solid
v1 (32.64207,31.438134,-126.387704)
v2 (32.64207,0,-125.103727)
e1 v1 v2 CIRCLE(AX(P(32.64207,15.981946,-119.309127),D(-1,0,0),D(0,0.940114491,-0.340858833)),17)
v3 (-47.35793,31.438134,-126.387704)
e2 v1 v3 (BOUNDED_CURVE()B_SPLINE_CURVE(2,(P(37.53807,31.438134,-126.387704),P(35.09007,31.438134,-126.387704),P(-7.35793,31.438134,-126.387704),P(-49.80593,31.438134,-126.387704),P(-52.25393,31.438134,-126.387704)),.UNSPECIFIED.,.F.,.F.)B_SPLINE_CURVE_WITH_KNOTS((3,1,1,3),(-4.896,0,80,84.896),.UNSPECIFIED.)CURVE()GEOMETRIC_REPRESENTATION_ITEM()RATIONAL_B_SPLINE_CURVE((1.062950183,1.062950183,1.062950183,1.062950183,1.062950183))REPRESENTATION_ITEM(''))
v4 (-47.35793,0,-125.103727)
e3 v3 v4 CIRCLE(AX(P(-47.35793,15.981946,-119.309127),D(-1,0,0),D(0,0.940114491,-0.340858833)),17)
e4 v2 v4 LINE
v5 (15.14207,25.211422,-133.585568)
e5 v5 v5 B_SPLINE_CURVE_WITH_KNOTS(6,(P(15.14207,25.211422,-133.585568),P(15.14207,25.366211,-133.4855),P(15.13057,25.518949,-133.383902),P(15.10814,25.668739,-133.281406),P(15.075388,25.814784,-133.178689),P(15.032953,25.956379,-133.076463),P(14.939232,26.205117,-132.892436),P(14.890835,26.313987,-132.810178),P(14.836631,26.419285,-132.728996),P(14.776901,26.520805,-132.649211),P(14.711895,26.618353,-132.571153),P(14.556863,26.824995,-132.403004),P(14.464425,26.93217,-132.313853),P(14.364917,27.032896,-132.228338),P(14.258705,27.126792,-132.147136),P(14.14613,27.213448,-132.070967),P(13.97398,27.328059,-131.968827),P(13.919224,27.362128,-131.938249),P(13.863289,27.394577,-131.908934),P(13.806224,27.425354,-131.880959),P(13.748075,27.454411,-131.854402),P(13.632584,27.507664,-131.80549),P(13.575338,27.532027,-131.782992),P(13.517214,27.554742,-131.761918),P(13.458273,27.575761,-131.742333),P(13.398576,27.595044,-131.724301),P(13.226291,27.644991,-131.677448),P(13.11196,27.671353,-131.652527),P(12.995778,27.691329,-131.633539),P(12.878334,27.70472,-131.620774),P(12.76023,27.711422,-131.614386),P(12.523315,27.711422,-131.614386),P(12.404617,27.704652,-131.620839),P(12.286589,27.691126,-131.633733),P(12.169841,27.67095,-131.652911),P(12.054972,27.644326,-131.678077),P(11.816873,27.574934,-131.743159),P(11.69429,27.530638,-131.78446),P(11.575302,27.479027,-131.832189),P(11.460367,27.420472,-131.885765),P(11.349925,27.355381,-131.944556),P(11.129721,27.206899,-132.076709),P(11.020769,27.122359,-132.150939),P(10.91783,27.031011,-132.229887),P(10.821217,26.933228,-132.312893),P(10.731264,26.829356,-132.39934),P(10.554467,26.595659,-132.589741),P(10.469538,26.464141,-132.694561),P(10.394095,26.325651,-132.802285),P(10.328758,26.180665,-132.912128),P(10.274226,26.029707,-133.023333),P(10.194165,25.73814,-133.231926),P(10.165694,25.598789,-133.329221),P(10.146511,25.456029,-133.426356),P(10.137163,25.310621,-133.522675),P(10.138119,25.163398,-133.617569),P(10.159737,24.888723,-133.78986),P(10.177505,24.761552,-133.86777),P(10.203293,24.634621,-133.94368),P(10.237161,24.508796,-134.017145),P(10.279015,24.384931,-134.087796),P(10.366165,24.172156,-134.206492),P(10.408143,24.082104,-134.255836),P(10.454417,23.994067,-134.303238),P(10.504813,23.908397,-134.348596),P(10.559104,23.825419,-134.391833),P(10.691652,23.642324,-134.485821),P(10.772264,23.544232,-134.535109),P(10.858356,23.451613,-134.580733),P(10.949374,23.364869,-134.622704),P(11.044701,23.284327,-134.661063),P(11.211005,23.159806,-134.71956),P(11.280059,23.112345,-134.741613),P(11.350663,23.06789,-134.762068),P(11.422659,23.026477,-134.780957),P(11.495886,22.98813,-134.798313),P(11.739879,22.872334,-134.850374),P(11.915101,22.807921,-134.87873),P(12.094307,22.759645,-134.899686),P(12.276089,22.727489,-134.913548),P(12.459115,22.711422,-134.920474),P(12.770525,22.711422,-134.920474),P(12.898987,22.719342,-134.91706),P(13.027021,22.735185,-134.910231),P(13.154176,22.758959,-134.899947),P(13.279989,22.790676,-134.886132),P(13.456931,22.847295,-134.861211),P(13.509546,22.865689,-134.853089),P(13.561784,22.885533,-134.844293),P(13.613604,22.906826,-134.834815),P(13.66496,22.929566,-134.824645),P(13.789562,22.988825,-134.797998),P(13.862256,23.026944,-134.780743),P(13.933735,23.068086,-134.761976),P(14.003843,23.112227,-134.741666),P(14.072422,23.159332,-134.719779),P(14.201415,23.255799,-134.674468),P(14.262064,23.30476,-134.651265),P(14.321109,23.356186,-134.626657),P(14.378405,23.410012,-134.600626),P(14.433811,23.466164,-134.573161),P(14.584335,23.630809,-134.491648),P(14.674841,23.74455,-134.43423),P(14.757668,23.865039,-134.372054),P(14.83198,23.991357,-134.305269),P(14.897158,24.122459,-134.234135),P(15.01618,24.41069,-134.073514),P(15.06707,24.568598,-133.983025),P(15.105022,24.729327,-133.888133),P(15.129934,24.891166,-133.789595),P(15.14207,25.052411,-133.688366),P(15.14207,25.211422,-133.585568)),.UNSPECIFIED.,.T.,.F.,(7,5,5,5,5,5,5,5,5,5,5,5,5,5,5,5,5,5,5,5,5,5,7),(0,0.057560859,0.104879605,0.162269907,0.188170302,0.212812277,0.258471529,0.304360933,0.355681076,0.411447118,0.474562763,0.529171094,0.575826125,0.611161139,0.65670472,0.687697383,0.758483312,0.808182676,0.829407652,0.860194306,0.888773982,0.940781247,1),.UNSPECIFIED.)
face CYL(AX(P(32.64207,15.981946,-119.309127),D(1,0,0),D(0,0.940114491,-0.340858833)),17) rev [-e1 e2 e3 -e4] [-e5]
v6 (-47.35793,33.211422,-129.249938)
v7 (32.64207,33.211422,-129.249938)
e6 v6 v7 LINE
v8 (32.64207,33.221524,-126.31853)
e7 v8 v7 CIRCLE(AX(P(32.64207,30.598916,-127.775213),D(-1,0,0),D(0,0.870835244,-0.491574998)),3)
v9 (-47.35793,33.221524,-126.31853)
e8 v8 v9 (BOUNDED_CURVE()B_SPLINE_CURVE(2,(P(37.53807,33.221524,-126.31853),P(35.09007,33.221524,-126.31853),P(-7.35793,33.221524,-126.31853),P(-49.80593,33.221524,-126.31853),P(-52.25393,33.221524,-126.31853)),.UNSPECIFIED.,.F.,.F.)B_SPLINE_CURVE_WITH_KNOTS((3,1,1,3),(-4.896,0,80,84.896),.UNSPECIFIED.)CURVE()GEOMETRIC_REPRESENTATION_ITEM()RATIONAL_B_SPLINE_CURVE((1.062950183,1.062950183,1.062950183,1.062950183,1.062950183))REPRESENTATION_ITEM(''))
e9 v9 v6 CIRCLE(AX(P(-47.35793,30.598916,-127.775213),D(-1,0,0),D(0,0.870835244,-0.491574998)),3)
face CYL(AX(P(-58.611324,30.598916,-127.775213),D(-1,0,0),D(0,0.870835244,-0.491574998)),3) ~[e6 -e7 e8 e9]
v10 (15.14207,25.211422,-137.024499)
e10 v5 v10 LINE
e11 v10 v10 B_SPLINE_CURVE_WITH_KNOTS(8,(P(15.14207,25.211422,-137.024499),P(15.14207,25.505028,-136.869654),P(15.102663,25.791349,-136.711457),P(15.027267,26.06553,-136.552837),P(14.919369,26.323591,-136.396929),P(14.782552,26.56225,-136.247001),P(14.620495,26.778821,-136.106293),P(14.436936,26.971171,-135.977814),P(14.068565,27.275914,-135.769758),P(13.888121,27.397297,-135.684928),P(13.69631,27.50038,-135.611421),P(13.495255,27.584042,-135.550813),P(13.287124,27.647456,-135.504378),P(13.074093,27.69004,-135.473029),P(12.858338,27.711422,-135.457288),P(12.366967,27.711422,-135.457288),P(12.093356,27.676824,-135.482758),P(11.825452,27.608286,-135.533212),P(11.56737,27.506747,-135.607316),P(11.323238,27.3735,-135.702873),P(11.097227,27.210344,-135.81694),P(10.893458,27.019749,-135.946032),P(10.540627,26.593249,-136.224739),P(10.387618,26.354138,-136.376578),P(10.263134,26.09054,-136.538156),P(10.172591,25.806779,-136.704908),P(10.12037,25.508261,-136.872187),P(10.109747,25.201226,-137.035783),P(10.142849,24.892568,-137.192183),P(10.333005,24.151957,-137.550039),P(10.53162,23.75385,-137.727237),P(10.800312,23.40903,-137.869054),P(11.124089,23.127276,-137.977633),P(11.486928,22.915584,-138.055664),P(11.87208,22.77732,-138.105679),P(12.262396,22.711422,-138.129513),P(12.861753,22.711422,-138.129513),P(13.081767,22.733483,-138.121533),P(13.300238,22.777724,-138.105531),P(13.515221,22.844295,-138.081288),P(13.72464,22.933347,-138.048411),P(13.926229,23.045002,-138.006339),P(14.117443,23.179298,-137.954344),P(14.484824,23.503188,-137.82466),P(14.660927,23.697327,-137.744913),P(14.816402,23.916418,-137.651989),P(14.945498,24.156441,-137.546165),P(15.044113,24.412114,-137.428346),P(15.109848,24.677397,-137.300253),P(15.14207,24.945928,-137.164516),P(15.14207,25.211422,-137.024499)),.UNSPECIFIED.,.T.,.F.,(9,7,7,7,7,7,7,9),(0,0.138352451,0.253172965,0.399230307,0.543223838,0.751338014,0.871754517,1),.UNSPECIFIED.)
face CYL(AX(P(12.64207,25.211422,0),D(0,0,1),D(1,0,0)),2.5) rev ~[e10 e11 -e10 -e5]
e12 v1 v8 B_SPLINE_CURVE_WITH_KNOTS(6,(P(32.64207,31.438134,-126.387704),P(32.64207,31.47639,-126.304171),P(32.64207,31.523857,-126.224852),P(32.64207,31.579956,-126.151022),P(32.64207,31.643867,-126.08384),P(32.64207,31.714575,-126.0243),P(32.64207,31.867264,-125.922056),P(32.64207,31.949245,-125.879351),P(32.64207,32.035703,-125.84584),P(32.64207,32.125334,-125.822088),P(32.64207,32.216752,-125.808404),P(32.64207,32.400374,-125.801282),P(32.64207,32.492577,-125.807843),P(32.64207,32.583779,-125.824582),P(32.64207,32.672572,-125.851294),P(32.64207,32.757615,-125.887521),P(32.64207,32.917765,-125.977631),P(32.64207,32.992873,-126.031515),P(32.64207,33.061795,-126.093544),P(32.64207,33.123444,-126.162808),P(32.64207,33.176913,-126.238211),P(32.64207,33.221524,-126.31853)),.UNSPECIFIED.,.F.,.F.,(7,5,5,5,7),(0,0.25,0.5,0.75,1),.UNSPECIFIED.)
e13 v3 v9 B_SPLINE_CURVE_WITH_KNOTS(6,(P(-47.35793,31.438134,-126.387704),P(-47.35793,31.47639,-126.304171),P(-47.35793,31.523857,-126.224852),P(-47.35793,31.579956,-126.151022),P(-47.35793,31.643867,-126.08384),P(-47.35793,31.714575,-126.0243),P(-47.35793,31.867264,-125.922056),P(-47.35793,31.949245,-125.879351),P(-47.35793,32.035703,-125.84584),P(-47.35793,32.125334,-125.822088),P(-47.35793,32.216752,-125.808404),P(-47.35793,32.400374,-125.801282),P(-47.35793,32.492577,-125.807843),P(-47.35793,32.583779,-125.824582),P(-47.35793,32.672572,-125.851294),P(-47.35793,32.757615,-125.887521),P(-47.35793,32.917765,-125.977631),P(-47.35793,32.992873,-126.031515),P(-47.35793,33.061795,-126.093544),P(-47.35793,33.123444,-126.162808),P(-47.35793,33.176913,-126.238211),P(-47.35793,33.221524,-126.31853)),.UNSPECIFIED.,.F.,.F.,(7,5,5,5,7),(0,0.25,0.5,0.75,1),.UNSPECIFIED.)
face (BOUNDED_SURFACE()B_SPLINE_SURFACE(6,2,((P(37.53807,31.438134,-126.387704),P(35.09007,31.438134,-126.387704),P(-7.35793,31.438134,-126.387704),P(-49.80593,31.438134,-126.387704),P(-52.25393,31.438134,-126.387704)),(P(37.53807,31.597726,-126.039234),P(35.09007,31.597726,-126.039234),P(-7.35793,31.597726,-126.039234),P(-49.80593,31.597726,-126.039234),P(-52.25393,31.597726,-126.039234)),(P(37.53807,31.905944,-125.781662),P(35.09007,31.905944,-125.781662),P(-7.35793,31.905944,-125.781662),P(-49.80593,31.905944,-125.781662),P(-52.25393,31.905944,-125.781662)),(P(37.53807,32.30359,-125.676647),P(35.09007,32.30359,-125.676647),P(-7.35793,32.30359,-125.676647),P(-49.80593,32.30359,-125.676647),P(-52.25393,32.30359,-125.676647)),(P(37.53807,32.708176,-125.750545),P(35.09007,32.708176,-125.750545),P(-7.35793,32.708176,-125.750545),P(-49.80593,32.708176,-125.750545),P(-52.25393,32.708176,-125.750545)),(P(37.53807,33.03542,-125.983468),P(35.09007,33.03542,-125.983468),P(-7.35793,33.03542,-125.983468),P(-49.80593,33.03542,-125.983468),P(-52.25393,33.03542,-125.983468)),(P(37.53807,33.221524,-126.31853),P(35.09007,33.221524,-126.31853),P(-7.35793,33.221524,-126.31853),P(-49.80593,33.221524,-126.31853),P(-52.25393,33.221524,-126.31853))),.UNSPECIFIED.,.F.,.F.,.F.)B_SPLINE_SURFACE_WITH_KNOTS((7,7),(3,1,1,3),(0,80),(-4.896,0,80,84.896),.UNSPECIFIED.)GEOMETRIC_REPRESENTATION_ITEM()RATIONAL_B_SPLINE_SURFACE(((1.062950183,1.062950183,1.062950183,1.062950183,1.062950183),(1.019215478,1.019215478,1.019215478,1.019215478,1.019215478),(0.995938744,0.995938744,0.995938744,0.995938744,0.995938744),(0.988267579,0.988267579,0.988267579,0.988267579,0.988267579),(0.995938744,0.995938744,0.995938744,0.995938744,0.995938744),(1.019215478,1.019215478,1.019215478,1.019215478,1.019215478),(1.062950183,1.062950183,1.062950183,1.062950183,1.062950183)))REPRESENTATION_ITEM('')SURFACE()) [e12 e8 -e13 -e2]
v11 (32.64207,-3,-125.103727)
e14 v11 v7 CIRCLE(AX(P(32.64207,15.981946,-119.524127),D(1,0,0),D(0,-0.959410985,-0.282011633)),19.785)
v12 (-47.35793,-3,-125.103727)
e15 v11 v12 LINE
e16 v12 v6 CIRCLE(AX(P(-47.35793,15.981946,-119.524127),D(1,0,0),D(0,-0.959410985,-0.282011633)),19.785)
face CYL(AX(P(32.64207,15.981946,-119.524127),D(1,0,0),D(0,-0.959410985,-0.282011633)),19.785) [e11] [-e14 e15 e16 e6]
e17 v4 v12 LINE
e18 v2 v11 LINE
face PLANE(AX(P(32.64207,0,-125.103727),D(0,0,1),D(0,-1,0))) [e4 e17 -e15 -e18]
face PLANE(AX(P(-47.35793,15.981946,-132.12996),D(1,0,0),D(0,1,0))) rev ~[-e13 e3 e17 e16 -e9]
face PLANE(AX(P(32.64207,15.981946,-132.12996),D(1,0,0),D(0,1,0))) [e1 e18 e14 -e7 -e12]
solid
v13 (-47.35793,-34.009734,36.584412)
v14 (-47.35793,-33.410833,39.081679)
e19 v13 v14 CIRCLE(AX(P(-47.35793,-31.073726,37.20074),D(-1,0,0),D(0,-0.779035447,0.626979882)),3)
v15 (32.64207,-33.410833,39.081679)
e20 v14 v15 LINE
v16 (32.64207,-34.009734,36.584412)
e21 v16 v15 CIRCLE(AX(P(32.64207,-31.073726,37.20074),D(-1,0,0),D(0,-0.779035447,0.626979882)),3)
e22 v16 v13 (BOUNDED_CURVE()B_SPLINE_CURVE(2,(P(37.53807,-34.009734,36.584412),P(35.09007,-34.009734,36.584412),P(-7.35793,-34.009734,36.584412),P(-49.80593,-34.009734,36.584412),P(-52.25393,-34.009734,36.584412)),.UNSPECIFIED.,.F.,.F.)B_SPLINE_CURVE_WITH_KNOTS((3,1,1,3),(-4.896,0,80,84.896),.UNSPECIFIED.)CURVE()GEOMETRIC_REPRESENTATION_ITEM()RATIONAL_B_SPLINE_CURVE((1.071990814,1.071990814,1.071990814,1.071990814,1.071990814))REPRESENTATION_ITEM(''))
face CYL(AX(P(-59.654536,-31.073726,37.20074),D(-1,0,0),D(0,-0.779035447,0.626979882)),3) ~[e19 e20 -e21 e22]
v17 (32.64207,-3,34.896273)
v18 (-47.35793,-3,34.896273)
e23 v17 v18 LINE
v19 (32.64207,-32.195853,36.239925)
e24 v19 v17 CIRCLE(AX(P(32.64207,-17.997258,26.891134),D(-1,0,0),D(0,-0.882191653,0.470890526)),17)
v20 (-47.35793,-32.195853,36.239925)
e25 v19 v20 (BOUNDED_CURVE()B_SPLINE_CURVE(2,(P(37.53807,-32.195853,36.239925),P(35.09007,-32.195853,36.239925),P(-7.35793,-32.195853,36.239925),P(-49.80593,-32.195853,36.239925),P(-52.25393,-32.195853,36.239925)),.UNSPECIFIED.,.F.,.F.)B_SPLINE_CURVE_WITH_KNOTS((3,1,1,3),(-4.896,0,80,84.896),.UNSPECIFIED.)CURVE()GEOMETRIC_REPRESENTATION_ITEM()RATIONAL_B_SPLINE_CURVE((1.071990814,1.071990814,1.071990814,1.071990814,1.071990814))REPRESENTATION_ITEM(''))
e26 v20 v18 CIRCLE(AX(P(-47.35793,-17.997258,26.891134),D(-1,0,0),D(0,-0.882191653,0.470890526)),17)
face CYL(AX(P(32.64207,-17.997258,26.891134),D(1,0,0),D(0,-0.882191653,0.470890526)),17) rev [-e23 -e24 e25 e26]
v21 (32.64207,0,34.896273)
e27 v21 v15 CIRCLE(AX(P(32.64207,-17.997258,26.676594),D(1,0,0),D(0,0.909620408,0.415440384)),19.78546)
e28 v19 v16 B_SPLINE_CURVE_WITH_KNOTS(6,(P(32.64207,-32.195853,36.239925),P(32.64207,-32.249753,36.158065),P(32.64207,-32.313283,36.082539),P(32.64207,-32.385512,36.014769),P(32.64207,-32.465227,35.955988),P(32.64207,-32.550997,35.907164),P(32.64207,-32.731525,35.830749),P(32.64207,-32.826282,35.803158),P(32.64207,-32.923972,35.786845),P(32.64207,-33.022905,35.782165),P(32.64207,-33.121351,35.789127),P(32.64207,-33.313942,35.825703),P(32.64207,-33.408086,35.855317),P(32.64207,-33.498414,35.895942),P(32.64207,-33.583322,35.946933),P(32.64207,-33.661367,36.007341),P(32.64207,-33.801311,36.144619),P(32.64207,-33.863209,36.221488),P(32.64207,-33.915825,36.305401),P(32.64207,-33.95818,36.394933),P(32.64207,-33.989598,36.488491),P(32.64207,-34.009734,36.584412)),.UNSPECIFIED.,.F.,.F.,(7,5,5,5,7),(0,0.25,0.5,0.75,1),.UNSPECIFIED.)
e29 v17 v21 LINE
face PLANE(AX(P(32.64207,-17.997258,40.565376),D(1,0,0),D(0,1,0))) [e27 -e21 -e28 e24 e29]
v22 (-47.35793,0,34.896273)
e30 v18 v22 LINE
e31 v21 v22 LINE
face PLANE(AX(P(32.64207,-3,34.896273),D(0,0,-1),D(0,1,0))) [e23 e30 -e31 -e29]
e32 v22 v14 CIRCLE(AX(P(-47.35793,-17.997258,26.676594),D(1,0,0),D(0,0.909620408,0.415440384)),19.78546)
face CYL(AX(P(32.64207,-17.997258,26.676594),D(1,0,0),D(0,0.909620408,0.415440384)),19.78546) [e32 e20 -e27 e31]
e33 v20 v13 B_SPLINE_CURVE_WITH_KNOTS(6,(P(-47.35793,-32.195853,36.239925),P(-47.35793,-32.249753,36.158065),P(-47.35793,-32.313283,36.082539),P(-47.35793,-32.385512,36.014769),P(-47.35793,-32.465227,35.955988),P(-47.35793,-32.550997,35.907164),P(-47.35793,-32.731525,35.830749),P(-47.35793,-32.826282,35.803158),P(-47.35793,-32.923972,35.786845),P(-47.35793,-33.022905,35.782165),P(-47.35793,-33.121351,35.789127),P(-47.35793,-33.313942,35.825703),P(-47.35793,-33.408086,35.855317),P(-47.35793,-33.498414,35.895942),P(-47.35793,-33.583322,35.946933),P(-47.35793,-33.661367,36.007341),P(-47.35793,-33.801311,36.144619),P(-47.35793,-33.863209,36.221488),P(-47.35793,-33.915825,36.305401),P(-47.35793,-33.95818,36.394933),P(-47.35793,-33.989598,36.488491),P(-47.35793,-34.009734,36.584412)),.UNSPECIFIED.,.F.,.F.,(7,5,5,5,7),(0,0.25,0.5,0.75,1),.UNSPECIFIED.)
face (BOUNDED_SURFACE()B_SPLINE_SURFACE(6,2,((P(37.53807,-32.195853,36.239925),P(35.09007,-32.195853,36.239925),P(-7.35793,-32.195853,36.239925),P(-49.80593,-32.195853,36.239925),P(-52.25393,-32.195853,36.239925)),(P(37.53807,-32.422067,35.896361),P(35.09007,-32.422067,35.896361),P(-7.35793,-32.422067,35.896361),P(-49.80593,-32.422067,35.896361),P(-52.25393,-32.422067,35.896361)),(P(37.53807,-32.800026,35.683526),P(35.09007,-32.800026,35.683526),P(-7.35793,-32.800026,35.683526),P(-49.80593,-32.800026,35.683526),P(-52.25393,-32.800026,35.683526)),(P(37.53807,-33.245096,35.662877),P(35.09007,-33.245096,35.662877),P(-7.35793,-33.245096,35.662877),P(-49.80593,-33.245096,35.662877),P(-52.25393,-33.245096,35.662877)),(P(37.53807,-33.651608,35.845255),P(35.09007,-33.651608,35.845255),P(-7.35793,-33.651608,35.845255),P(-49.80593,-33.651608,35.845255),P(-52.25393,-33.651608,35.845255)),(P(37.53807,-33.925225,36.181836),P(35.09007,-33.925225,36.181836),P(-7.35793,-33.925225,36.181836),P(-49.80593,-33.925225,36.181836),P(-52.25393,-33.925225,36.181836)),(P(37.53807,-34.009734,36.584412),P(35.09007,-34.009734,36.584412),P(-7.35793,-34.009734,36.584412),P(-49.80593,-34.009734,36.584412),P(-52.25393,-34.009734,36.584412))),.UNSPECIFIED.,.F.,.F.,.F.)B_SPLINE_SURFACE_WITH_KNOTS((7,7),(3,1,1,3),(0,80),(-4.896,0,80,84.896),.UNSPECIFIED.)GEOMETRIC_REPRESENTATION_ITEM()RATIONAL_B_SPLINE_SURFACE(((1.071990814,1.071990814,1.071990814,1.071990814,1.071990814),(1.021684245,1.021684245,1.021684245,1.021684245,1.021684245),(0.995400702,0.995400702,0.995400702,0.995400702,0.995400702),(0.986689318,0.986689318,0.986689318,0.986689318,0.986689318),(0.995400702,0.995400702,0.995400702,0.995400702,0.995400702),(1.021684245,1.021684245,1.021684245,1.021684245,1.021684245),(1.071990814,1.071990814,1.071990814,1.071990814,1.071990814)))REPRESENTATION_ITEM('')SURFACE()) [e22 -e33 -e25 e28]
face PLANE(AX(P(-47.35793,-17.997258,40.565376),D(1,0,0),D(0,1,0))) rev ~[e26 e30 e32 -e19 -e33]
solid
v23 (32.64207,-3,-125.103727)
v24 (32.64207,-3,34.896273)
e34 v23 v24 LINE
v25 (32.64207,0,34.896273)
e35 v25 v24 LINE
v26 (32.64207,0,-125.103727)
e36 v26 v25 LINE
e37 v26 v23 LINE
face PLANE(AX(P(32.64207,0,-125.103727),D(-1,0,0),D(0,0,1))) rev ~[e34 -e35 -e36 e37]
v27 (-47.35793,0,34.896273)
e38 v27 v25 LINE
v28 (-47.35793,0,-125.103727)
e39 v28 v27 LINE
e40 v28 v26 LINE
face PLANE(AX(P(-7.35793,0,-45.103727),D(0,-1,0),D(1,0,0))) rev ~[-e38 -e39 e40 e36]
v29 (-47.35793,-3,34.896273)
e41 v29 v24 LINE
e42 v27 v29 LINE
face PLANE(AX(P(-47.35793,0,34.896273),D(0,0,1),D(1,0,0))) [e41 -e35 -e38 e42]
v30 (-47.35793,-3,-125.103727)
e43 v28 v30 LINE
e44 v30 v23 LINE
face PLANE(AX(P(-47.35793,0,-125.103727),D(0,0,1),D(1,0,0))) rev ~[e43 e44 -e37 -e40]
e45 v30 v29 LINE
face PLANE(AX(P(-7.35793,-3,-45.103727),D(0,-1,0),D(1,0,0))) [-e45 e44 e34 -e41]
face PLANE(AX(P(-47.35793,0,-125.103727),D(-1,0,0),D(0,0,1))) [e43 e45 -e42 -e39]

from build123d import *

# Parameters (mm, degrees)
F0_W          = 80
F0_H          = 160
F1_DEPTH      = 3
F3_DEPTH      = 80
F4_T1_DEPTH   = 104.5932134922
F4_2_T1_DEPTH = 102.506788887
F5_R          = 1
F5_2_R        = 1
F6_R          = 2.5
F7_DEPTH      = 139.3101269636


# Not quite as in the source:
# - a fillet or chamfer that OpenCascade refuses, or shapes differently, is made with other operations: its cross-section is extruded or revolved along the edge and cut away or added


with BuildPart() as f1:
    # F0 (on Front) → F1 (new body)
    with BuildSketch(Plane.XZ):
        with Locations((-7.3579295626, -45.1037270249)):
            Rectangle(F0_W, F0_H)
    extrude(amount=F1_DEPTH)


with BuildPart() as f3:
    # F2 (on face) → F3 (new body)
    with BuildSketch(Plane.YZ.offset(32.6420704374)):
        with BuildLine():
            Line((-3, 34.8962729751), (0, 34.8962729751))
            ThreePointArc((0, 34.8962729751), (-17.9972580969, 46.4620537988), (-35.9945161939, 34.8962729751))
            Line((-35.9945161939, 34.8962729751), (-32.9945161939, 34.8962729751))
            ThreePointArc((-32.9945161939, 34.8962729751), (-17.9972580969, 43.8911340273), (-3, 34.8962729751))
        make_face()
    extrude(amount=-F3_DEPTH)

    # F4: fillet of radius 3 on 1 edges, made by hand

    # F4_s2 → F4_t1 (cut)
    with BuildSketch(Plane.YZ.offset(-59.6545363087)):
        with BuildLine():
            ThreePointArc((-33.4108326759, 39.0816792247), (-34.0589945612, 36.9037991395), (-32.9945161939, 34.8962729751))
            Line((-32.9945161939, 34.8962729751), (-35.9945161939, 34.8962729751))
            ThreePointArc((-35.9945161939, 34.8962729751), (-34.8332416261, 37.0695762328), (-33.4108326759, 39.0816792247))
        make_face()
    extrude(amount=F4_T1_DEPTH, mode=Mode.SUBTRACT)

    # F5
    f5_edges = [f3.edges().sort_by_distance(p)[0] for p in [
        (-7.35793, -32.994516, 34.896273),
    ]]
    fillet(f5_edges, radius=F5_R)


with BuildPart() as f3b:
    # F2 (on face) → F3, piece 2 (new body)
    with BuildSketch(Plane.YZ.offset(32.6420704374)):
        with BuildLine():
            ThreePointArc((31.9638926898, -125.1037270249), (15.9819463449, -136.3091268636), (0, -125.1037270249))
            Line((0, -125.1037270249), (-3, -125.1037270249))
            ThreePointArc((-3, -125.1037270249), (15.9819463449, -139.3091268636), (34.9638926898, -125.1037270249))
            Line((34.9638926898, -125.1037270249), (31.9638926898, -125.1037270249))
        make_face()
    extrude(amount=-F3_DEPTH)

    # F4#2: fillet of radius 3 on 1 edges, made by hand

    # F4_2_s2 → F4_2_t1 (cut)
    with BuildSketch(Plane.YZ.offset(-58.6113240061)):
        with BuildLine():
            ThreePointArc((33.2114216404, -129.2499381943), (33.4716947989, -126.9108397557), (31.9638926898, -125.1037270249))
            Line((31.9638926898, -125.1037270249), (34.9638926898, -125.1037270249))
            ThreePointArc((34.9638926898, -125.1037270249), (34.2059560867, -127.2268337858), (33.2114216404, -129.2499381943))
        make_face()
    extrude(amount=F4_2_T1_DEPTH, mode=Mode.SUBTRACT)

    # F5#2
    f5_2_edges = [f3b.edges().sort_by_distance(p)[0] for p in [
        (-7.35793, 31.963893, -125.103727),
    ]]
    fillet(f5_2_edges, radius=F5_2_R)

    # F6 (on Top) → F7 (cut, through all)
    with BuildSketch(Plane.XY):
        with Locations((12.6420704374, 25.2114216404)):
            Circle(F6_R)
    extrude(amount=-F7_DEPTH, mode=Mode.SUBTRACT)


solid = Compound([f1.part, f3.part, f3b.part])
